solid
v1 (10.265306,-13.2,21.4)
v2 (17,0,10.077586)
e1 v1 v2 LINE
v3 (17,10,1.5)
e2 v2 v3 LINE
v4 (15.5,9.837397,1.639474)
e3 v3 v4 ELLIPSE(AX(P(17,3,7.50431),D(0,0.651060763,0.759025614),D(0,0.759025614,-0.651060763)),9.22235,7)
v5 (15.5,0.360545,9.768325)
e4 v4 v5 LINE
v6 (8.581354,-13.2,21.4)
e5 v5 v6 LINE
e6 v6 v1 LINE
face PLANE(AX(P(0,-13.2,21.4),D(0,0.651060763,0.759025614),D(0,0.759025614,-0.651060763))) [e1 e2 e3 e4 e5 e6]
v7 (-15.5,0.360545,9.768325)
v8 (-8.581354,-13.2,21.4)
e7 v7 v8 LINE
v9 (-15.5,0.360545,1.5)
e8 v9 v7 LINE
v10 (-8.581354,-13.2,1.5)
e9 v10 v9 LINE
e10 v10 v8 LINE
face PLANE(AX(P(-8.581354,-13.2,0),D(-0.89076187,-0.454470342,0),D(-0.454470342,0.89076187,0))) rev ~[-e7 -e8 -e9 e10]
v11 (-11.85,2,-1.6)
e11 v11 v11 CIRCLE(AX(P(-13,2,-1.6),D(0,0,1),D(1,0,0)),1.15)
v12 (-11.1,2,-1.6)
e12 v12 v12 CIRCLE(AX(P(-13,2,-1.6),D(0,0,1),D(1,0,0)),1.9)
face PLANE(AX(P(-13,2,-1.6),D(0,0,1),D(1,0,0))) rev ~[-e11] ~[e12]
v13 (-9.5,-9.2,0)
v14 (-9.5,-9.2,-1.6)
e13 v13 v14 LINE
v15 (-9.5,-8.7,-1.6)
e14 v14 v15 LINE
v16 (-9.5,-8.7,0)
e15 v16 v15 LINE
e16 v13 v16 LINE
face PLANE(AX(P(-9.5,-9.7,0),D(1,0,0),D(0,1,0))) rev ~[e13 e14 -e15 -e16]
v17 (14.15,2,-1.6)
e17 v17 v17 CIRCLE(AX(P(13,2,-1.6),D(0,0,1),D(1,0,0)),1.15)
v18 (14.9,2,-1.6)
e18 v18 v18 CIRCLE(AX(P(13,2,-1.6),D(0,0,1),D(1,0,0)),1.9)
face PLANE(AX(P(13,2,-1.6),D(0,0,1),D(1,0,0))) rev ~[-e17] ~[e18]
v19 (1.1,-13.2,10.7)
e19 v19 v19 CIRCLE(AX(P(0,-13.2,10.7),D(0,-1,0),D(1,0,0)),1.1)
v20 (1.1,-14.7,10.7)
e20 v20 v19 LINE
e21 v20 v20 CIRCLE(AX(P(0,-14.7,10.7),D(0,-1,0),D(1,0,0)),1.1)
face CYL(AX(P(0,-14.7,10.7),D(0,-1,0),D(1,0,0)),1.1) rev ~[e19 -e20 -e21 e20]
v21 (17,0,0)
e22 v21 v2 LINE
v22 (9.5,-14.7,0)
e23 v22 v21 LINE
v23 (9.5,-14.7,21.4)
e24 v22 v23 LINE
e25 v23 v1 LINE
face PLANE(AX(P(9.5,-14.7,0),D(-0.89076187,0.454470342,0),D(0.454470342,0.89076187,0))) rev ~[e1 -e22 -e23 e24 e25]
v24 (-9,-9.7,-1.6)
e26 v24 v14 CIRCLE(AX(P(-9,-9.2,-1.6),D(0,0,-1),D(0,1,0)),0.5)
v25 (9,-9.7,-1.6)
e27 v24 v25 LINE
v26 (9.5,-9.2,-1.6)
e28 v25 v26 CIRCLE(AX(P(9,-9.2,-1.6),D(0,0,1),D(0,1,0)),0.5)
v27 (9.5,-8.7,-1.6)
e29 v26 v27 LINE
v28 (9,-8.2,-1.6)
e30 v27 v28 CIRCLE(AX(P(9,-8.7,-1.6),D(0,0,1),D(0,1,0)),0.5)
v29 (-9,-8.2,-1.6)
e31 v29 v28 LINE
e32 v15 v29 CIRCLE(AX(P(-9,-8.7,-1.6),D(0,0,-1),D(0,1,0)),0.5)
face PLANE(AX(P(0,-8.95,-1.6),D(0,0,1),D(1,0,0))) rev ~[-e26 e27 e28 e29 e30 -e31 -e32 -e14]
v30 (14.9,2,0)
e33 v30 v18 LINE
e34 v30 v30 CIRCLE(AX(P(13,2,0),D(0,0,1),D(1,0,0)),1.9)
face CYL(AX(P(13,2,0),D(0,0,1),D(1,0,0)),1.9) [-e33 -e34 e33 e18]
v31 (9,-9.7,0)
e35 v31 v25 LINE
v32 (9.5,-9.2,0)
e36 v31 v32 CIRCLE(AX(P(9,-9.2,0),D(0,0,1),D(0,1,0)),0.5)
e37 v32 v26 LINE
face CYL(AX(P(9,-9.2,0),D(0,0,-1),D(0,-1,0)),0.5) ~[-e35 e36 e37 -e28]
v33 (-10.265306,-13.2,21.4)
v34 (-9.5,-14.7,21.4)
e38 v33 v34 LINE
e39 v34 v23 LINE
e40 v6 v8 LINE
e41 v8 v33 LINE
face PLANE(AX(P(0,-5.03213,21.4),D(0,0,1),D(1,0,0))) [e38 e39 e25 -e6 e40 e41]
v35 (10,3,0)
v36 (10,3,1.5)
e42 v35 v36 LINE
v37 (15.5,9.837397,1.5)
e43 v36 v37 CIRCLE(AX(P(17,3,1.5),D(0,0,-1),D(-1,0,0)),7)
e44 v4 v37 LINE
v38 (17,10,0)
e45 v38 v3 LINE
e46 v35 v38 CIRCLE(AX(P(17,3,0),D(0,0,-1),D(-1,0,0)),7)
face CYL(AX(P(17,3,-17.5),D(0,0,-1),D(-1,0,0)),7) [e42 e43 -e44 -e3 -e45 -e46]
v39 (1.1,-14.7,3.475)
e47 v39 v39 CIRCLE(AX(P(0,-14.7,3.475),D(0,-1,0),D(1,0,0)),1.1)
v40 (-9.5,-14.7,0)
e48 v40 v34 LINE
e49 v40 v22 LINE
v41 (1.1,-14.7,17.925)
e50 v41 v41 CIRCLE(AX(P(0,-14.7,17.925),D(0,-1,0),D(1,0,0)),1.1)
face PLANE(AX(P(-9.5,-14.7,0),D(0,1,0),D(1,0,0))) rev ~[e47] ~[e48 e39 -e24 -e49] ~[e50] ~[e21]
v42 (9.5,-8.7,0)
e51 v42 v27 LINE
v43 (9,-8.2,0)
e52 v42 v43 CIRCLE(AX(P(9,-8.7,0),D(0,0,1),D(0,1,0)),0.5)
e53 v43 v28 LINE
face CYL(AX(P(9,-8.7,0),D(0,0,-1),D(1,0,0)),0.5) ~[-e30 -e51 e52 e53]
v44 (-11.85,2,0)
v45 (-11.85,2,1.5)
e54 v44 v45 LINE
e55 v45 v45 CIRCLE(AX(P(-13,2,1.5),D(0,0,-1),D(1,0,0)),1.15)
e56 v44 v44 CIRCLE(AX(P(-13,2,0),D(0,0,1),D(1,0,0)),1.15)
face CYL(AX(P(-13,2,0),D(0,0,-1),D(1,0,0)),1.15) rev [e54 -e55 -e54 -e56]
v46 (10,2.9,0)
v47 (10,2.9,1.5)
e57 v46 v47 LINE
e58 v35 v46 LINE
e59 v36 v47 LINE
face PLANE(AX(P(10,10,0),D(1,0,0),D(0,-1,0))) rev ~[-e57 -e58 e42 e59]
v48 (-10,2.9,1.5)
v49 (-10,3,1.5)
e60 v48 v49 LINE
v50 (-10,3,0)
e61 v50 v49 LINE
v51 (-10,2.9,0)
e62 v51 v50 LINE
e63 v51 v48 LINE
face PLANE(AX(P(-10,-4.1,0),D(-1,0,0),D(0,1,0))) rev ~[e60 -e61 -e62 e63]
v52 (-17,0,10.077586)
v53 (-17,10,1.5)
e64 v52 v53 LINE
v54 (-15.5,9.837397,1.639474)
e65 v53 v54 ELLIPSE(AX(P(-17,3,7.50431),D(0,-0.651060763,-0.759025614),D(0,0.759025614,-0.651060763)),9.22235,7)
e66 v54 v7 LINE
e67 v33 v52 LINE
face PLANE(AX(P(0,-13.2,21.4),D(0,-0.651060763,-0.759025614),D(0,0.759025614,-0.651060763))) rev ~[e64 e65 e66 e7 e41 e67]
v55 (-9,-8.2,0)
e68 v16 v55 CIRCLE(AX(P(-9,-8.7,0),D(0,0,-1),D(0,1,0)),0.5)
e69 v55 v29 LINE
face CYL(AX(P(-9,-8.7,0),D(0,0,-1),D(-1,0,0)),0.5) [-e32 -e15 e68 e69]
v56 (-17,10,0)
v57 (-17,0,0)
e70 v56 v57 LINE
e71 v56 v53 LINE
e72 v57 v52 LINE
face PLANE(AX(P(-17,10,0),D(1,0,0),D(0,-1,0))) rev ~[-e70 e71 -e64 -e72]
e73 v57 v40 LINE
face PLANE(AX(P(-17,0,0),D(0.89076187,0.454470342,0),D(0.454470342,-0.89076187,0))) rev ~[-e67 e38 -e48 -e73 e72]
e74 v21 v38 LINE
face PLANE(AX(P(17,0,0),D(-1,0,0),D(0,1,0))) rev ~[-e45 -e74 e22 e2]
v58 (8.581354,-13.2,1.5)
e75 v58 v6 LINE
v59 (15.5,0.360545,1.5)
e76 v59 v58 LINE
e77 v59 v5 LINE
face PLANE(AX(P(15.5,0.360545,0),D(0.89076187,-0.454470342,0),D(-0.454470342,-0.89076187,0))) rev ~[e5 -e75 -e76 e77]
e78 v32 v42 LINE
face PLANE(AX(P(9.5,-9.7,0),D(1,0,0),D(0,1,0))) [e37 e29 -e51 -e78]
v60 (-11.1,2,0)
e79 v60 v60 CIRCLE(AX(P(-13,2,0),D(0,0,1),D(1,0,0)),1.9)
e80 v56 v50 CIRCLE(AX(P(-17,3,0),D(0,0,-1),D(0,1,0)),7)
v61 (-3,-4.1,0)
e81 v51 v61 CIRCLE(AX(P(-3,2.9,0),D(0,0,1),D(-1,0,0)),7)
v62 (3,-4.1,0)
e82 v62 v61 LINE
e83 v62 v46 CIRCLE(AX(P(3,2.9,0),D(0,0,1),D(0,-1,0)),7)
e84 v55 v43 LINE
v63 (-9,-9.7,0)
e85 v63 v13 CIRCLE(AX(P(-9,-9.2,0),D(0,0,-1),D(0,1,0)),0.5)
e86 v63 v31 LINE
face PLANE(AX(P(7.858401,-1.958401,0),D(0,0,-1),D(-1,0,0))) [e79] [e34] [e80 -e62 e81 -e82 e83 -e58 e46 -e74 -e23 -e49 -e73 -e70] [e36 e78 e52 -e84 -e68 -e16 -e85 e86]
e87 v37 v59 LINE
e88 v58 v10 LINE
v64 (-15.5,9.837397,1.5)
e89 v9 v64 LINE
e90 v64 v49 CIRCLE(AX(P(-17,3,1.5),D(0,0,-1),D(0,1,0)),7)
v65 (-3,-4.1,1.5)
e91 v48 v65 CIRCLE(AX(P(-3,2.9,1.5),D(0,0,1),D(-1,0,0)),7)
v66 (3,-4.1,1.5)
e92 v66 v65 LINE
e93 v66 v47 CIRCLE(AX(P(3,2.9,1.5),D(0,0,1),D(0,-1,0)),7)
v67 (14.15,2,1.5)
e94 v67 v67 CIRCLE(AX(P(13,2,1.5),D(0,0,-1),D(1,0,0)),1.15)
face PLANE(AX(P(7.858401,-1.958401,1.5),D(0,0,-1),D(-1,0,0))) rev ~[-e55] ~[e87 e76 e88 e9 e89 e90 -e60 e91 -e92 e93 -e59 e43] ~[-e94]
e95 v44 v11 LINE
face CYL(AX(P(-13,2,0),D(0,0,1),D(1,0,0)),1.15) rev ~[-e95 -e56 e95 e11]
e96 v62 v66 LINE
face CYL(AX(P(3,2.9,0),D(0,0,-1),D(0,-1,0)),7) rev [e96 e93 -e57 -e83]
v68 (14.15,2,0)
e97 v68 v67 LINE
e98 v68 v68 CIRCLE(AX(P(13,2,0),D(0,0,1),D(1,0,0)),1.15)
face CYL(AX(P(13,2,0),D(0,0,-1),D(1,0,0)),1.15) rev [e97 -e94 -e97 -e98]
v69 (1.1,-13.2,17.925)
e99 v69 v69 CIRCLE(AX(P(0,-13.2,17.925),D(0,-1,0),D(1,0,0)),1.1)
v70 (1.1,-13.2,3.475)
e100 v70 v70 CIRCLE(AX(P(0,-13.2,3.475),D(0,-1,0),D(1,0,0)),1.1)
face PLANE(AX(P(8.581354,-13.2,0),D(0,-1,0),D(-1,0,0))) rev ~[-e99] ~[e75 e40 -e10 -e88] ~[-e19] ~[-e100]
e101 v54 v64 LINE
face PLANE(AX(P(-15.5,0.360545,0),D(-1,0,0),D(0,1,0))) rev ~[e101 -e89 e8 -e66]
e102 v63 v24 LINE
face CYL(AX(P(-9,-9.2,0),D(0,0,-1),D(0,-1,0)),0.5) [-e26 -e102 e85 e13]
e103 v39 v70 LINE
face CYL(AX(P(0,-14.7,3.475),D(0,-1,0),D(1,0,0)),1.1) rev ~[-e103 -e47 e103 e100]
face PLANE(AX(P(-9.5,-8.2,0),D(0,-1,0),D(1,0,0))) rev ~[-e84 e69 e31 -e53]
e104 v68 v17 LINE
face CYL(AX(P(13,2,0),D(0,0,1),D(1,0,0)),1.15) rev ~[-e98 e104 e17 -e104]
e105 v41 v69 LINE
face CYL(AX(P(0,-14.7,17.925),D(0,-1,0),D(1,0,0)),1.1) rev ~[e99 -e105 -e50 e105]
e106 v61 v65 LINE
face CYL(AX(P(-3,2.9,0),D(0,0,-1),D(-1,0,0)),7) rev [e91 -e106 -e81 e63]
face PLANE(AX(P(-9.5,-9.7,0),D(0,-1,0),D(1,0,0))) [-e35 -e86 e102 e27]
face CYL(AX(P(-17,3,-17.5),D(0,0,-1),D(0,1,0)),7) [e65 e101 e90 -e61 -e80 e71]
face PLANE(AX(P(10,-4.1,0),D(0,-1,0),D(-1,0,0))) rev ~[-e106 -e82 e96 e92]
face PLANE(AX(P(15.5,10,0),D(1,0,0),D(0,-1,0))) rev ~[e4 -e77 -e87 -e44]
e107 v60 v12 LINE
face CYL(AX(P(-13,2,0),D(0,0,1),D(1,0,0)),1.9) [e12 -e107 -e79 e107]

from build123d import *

# Parameters (mm, degrees)
F4_DEPTH       = 21.4
F5_DEPTH       = 1.5
F1_R           = 1.9
F1_W           = 19
F1_H           = 1.5
F6_DEPTH       = 1.6
F8_DEPTH       = 17.001
F8_DEPTH_BACK  = 17.001
F9_R           = 1.15
F10_DEPTH      = 21.401
F10_DEPTH_BACK = 1.601
F11_R          = 1.1
F12_DEPTH      = 1.5
F13_T1_DEPTH   = 1.5
F13_T3_DEPTH   = 36.5
F14_R          = 0.5


# Not quite as in the source:
# - a fillet or chamfer that OpenCascade refuses, or shapes differently, is made with other operations: its cross-section is extruded or revolved along the edge and cut away or added


with BuildPart() as f4:
    # F3 (on face) → F4 (new body)
    with BuildSketch(Plane.XY):
        Polygon((-15.5, 10), (-17, 10), (-17, 0), (-9.5, -14.7), (0, -14.7), (9.5, -14.7), (17, 0), (17, 10), (15.5, 10), (15.5, 0.3605454095), (8.5813543829, -13.2), (0, -13.2), (-8.5813543829, -13.2), (-15.5, 0.3605454095), align=None)
    extrude(amount=F4_DEPTH)

    # F2 (on Top) → F5 (join)
    with BuildSketch(Plane.XY):
        Polygon((-17, 0), (-9.5, -14.7), (0, -14.7), (9.5, -14.7), (17, 0), (17, 10), (10, 10), (10, -4.1), (0, -4.1), (-10, -4.1), (-10, 10), (-17, 10), align=None)
    extrude(amount=F5_DEPTH)

    # F1 (on Top) → F6 (join)
    with BuildSketch(Plane.XY):
        with Locations((-13, 2)):
            Circle(F1_R)
        with Locations((13, 2)):
            Circle(F1_R)
        with Locations((0, -8.95)):
            Rectangle(F1_W, F1_H)
    extrude(amount=-F6_DEPTH)

    # F7 (on Right) → F8 (cut, two sides)
    with BuildSketch(Plane.YZ) as f8_sk:
        Polygon((-13.2, 21.4), (10, 1.5), (10, 21.4), align=None)
    extrude(amount=-F8_DEPTH, mode=Mode.SUBTRACT)
    extrude(f8_sk.sketch, amount=F8_DEPTH_BACK, mode=Mode.SUBTRACT)

    # F9 (on Top) → F10 (cut, two sides)
    with BuildSketch(Plane.XY) as f10_sk:
        with Locations((13, 2)):
            Circle(F9_R)
        with Locations((-13, 2)):
            Circle(F9_R)
    extrude(amount=F10_DEPTH, mode=Mode.SUBTRACT)
    extrude(f10_sk.sketch, amount=-F10_DEPTH_BACK, mode=Mode.SUBTRACT)

    # F11 (on face) → F12 (cut, through all)
    with BuildSketch(Plane.XZ.offset(14.7)):
        with Locations((0, 3.475)):
            Circle(F11_R)
        with Locations((0, 17.925)):
            Circle(F11_R)
        with Locations((0, 10.7)):
            Circle(F11_R)
    extrude(amount=-F12_DEPTH, mode=Mode.SUBTRACT)

    # F13: fillet of radius 7 on 4 edges, made by hand

    # F13_s2 → F13_t1 (join)
    with BuildSketch(Plane.XY):
        with BuildLine():
            ThreePointArc((3, -4.1), (7.9497474683, -2.0497474683), (10, 2.9))
            Line((10, 2.9), (10, -4.1))
            Line((10, -4.1), (3, -4.1))
        make_face()
        with BuildLine():
            ThreePointArc((-10, 2.9), (-7.9497474683, -2.0497474683), (-3, -4.1))
            Line((-3, -4.1), (-10, -4.1))
            Line((-10, -4.1), (-10, 2.9))
        make_face()
    extrude(amount=F13_T1_DEPTH)

    # F13_s4 → F13_t3 (cut)
    with BuildSketch(Plane.XY.offset(-17.5)):
        with BuildLine():
            ThreePointArc((-17, 10), (-12.0502525317, 7.9497474683), (-10, 3))
            Line((-10, 3), (-10, 10))
            Line((-10, 10), (-17, 10))
        make_face()
        with BuildLine():
            ThreePointArc((10, 3), (12.0502525317, 7.9497474683), (17, 10))
            Line((17, 10), (10, 10))
            Line((10, 10), (10, 3))
        make_face()
    extrude(amount=F13_T3_DEPTH, mode=Mode.SUBTRACT)

    # F14
    f14_edges = [f4.edges().sort_by_distance(p)[0] for p in [
        (-9.5, -8.2, -0.8),
        (-9.5, -9.7, -0.8),
        (9.5, -8.2, -0.8),
        (9.5, -9.7, -0.8),
    ]]
    fillet(f14_edges, radius=F14_R)


solid = f4.part
